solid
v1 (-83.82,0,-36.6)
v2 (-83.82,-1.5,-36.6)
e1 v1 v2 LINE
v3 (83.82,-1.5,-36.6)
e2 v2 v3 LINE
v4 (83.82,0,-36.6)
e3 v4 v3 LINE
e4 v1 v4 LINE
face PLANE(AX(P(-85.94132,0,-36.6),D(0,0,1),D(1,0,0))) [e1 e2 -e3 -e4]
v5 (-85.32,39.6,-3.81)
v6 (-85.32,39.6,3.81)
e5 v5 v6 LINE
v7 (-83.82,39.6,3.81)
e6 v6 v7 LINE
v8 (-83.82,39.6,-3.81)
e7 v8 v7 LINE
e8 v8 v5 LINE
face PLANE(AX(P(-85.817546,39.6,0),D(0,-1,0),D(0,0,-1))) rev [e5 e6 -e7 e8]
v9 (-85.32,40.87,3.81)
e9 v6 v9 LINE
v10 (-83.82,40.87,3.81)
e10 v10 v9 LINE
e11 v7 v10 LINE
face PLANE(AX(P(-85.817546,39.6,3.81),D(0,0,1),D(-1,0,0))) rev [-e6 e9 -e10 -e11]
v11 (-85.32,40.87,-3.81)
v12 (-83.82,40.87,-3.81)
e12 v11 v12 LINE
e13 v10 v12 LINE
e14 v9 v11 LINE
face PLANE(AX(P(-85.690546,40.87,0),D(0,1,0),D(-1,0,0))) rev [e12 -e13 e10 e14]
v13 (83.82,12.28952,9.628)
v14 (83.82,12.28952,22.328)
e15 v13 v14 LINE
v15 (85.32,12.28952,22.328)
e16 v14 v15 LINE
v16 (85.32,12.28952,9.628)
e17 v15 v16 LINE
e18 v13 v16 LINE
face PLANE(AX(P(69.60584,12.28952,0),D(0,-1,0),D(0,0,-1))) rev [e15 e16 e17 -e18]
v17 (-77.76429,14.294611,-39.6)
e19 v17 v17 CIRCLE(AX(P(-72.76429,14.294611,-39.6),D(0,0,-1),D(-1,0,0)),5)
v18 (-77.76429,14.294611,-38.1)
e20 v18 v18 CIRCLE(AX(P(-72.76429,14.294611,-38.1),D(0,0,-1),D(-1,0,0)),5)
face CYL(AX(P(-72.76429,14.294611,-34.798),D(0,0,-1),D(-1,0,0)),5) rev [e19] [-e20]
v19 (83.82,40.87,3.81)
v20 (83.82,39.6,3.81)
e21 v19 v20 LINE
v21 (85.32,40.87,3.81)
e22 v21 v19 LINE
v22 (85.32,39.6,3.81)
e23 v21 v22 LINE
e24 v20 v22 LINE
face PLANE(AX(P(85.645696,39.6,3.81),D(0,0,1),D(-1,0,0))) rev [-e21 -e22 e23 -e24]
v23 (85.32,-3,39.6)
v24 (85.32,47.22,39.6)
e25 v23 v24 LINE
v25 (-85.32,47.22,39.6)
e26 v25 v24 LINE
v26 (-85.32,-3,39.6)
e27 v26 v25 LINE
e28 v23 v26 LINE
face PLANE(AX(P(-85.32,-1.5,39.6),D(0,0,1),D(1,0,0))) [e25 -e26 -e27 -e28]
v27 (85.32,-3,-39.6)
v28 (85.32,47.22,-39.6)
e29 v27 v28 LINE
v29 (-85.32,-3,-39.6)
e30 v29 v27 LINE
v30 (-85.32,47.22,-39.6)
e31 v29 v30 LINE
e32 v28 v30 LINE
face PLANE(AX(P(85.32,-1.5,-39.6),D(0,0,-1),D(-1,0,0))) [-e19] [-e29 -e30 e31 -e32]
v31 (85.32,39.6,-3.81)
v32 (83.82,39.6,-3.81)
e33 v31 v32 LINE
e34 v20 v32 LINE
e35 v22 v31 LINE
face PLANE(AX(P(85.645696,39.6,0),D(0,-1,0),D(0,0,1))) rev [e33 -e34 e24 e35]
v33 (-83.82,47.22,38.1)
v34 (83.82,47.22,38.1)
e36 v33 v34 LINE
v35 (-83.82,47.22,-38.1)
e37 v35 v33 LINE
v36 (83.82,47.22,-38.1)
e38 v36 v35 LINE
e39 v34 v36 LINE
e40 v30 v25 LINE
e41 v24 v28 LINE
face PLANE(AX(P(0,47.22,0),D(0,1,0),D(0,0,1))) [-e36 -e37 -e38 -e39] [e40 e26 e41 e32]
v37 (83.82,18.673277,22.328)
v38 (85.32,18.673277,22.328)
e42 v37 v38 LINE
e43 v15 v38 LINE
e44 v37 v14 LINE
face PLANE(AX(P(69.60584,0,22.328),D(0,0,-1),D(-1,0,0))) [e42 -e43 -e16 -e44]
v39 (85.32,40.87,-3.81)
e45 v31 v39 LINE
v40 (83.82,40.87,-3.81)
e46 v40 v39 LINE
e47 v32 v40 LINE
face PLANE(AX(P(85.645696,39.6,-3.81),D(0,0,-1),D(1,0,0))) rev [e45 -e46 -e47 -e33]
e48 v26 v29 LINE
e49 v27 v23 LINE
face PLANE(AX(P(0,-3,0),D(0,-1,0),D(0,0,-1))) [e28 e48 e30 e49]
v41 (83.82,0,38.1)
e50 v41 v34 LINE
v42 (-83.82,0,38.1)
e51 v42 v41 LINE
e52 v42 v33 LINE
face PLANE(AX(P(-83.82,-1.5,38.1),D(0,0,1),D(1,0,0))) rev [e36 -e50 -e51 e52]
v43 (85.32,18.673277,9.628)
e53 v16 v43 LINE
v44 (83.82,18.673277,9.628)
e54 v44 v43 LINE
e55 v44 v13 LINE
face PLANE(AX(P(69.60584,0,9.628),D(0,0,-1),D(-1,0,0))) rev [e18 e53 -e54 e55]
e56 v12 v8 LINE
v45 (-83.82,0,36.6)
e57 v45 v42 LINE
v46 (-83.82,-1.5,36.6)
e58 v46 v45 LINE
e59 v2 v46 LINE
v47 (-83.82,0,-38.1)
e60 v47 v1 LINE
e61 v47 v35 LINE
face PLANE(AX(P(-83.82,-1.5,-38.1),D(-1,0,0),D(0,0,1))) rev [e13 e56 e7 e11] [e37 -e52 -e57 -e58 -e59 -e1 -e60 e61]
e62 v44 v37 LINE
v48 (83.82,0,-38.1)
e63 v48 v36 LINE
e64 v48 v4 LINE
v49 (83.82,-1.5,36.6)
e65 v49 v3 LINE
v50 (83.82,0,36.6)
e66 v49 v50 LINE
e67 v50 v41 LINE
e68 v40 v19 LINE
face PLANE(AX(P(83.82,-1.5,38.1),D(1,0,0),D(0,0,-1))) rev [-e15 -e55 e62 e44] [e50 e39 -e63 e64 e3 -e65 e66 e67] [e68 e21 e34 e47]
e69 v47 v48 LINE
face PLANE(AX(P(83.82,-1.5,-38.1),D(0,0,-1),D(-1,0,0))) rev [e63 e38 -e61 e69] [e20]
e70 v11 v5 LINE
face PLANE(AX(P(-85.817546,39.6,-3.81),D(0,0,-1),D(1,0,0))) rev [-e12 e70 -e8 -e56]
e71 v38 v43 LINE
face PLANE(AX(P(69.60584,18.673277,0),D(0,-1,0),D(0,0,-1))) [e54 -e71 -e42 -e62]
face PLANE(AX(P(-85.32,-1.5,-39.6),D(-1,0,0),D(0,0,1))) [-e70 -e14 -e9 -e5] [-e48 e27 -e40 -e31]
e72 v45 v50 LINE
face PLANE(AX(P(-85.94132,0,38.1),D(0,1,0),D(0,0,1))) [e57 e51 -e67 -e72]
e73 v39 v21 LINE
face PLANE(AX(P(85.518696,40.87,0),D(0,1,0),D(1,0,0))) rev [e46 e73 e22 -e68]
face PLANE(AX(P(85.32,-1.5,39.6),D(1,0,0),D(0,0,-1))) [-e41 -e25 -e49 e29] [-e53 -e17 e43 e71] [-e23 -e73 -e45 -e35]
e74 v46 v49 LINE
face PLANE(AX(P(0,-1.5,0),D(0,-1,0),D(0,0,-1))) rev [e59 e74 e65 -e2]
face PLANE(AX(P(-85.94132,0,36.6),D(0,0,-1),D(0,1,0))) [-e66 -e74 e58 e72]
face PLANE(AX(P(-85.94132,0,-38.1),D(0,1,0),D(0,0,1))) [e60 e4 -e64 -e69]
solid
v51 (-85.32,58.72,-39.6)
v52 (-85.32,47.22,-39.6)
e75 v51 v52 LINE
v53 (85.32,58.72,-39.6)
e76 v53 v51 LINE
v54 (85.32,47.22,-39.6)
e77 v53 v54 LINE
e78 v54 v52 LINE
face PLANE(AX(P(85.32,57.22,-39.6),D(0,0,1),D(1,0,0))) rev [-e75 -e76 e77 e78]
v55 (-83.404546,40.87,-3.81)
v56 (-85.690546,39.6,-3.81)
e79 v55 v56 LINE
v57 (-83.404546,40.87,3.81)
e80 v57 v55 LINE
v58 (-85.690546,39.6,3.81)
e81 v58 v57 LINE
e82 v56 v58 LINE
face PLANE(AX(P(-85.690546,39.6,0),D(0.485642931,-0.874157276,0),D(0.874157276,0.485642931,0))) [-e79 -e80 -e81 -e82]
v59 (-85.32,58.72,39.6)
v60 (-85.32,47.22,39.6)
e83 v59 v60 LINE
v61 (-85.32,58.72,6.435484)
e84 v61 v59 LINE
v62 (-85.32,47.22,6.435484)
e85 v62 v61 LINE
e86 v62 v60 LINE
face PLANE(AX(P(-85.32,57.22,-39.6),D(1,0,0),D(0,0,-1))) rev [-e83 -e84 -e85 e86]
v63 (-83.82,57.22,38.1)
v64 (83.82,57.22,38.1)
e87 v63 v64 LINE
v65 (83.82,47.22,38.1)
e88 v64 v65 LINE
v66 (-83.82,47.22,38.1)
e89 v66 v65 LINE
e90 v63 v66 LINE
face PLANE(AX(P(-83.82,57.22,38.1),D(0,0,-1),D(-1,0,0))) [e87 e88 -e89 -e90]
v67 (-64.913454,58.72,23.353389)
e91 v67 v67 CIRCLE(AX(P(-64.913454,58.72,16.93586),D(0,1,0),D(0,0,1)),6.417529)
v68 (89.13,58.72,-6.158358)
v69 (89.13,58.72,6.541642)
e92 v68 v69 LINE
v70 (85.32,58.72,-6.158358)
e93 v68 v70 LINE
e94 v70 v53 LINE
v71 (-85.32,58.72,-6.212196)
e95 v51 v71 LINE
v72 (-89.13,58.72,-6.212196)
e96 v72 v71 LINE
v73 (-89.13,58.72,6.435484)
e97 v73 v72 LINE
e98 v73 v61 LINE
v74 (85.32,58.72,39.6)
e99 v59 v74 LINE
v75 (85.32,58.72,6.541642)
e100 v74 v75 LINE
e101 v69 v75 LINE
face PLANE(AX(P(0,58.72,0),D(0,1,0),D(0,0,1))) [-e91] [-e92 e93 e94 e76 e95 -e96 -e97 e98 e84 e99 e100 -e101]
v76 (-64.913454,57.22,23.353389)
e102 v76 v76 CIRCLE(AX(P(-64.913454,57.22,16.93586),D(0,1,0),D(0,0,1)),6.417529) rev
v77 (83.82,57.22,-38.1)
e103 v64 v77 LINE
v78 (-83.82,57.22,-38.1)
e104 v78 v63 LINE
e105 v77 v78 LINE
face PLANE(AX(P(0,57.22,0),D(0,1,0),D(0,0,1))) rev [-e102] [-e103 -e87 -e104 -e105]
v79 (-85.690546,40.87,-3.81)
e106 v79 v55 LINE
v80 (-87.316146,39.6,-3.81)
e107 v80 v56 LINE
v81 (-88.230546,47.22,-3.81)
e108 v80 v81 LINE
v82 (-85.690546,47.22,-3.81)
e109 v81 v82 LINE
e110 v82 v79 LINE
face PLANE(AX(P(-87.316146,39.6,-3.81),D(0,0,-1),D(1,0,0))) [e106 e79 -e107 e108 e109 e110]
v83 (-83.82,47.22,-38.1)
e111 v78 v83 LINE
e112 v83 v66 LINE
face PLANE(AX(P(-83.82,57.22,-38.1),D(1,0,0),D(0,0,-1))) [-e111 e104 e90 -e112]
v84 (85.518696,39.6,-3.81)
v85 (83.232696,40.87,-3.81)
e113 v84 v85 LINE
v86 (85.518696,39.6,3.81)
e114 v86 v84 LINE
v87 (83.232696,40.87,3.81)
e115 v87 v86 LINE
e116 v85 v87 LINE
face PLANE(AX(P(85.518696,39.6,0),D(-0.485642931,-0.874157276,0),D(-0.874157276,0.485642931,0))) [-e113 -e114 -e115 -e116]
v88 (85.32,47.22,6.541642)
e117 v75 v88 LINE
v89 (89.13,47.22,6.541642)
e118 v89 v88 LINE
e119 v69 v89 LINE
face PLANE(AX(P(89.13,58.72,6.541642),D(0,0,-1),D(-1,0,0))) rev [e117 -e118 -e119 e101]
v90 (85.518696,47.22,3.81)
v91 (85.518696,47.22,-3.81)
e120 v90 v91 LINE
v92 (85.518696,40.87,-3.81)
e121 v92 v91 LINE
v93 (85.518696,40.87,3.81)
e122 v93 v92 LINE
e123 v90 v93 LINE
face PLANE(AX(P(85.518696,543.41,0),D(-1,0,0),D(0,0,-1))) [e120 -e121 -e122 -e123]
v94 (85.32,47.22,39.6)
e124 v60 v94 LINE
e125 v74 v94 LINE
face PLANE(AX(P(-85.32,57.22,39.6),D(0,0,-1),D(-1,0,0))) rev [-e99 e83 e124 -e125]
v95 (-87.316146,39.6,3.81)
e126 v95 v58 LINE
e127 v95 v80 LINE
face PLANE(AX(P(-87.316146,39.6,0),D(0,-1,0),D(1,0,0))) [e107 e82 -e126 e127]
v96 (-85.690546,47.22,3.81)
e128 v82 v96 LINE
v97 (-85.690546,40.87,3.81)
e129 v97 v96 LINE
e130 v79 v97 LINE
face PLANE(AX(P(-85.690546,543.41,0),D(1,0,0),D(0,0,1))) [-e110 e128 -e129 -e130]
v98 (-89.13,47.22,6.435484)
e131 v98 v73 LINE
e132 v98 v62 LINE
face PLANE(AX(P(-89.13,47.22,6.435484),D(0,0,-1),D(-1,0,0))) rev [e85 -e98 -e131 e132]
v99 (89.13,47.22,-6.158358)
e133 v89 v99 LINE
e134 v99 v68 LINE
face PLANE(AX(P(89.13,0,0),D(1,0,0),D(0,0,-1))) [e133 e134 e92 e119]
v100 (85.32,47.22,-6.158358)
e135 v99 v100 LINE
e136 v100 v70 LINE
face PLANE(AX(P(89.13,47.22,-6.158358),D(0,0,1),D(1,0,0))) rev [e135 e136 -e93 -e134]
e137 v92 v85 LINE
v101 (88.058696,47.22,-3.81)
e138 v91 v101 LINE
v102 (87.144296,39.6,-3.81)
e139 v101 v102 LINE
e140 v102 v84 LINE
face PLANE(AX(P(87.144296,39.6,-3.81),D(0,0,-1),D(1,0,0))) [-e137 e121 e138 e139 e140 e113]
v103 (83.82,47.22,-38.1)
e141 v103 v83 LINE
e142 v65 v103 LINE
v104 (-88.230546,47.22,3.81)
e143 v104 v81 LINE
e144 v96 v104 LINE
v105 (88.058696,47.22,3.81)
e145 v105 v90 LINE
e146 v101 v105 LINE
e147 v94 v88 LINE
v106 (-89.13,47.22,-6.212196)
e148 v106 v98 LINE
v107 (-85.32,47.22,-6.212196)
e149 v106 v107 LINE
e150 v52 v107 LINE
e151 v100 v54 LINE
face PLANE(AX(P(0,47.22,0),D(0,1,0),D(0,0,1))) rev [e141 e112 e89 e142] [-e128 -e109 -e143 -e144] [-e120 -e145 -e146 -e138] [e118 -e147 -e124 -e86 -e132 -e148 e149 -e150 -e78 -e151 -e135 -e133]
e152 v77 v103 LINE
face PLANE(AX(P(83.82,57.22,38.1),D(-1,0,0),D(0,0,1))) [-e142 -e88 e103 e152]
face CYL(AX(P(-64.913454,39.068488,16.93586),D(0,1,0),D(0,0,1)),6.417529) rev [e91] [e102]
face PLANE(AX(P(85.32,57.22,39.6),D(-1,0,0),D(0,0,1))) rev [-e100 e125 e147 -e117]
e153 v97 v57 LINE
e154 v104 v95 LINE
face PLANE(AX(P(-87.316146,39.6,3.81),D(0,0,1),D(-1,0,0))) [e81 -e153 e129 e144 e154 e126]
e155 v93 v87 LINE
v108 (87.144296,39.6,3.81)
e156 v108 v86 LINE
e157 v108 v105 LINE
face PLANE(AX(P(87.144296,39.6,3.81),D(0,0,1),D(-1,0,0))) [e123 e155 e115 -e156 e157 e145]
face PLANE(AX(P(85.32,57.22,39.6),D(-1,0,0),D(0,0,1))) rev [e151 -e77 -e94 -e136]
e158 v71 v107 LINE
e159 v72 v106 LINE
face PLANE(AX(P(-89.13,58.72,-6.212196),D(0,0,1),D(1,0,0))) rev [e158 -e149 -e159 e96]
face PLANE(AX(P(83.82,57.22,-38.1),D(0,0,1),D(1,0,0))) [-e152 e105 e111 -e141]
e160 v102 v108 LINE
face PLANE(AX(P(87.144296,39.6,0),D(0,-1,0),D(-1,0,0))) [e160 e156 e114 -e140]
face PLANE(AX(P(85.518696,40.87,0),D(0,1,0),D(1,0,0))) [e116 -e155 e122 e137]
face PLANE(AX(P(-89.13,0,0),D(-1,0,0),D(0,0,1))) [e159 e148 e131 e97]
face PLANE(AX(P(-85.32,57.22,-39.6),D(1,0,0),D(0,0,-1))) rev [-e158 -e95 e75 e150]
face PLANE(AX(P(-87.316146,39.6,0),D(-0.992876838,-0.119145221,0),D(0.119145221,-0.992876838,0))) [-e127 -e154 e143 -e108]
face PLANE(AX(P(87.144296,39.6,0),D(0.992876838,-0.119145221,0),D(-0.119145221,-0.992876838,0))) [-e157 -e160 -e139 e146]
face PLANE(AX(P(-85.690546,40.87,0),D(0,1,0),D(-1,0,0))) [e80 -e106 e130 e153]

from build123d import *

# Parameters (mm, degrees)
SKETCH15_W             = 167.64
SKETCH15_H             = 76.2
BB_STM_SIHLOETTE_DEPTH = 1.5
BASEWALL_DEPTH         = 45.72
BASEWALL_DEPTH_BACK    = 3
SKETCH29_W             = 170.64
SKETCH29_H             = 79.2
SKETCH29_W_2           = 167.64
SKETCH29_H_2           = 76.2
SKETCH31_W             = 1.5
SKETCH31_H             = 1.5
BASESUPPORT_DEPTH      = 169.14
BASESUPPORT_2_DEPTH    = 169.14
SKETCH33_W             = 170.64
SKETCH33_H             = 79.2
BASEBOTTOM_DEPTH       = 1.5
SKETCH43_W             = 12.7
SKETCH43_H             = 6.383756828
CUT_EXTRUDE8_DEPTH     = 1.5
SKETCH36_W             = 170.64
SKETCH36_H             = 79.2
SKETCH36_W_2           = 167.64
SKETCH36_H_2           = 76.2
BOSS_EXTRUDE16_DEPTH   = 10
SKETCH37_W             = 170.64
SKETCH37_H             = 79.2
BOSS_EXTRUDE17_DEPTH   = 1.5
SKETCH39_R             = 5
CUT_EXTRUDE5_DEPTH     = 4.802
SKETCH41_R             = 6.417528543
CUT_EXTRUDE6_DEPTH     = 1.5
SKETCH46_W             = 12.7
SKETCH46_H             = 11.5
BOSS_EXTRUDE18_DEPTH   = 3.81
SNAP_START             = -3.81
SNAP_HOOK4_DEPTH       = 7.62
SNAP_START_2           = 39.6
SNAP_GROOVE3_OUTLINE_W = 1.5
SNAP_GROOVE3_OUTLINE_H = 7.62
SNAP_GROOVE3_DEPTH     = 1.27
SKETCH51_W             = 12.647680061
SKETCH51_H             = 11.5
BOSS_EXTRUDE19_DEPTH   = 3.81
SNAP_HOOK5_DEPTH       = 7.62
SNAP_GROOVE4_OUTLINE_W = 1.5
SNAP_GROOVE4_OUTLINE_H = 7.62
SNAP_GROOVE4_DEPTH     = 1.27


# Read off the part's stored shape, not the designer's step: Snap Hook4, Snap Groove3, Snap Hook5, Snap Groove4
with BuildPart() as part:
    # Sketch15 → BB+STM Sihloette (new body)
    with BuildSketch(Plane(origin=(0, 0, 0), x_dir=(1, 0, 0), z_dir=(0, 1, 0))):
        Rectangle(SKETCH15_W, SKETCH15_H)
    extrude(amount=BB_STM_SIHLOETTE_DEPTH)


with BuildPart() as body_2:
    # Sketch29 → basewall (new, two sides: drawn at the far end of the back side and taken through both)
    with BuildSketch(Plane(origin=(0, 1.5, 0), x_dir=(1, 0, 0), z_dir=(0, 1, 0)).offset(-BASEWALL_DEPTH_BACK)):
        Rectangle(SKETCH29_W, SKETCH29_H)
        Rectangle(SKETCH29_W_2, SKETCH29_H_2, mode=Mode.SUBTRACT)
    extrude(amount=BASEWALL_DEPTH + BASEWALL_DEPTH_BACK)



with BuildPart() as body_3:
    # Sketch31 → basesupport (new body)
    with BuildSketch(Plane(origin=(85.32, 0, 0), x_dir=(0, 0, -1), z_dir=(1, 0, 0))):
        with Locations((37.35, -0.75)):
            Rectangle(SKETCH31_W, SKETCH31_H)
    extrude(amount=-BASESUPPORT_DEPTH)


with BuildPart() as body_4:
    # Sketch31 → basesupport 2 (new body)
    with BuildSketch(Plane(origin=(85.32, 0, 0), x_dir=(0, 0, -1), z_dir=(1, 0, 0))):
        with Locations((-37.35, -0.75)):
            Rectangle(SKETCH31_W, SKETCH31_H)
    extrude(amount=-BASESUPPORT_2_DEPTH)


with BuildPart() as body_2_1:
    add(body_2.part)

    add(body_3.part)  # basebottom merges body 3

    add(body_4.part)  # basebottom merges body 4
    # Sketch33 → basebottom (add)
    with BuildSketch(Plane.XZ.offset(1.5)):
        Rectangle(SKETCH33_W, SKETCH33_H)
    extrude(amount=BASEBOTTOM_DEPTH)

    # Sketch43 → Cut-Extrude8 (cut)
    with BuildSketch(Plane(origin=(85.32, 0, 0), x_dir=(0, 0, -1), z_dir=(1, 0, 0))):
        with Locations((-15.978, 15.481398318)):
            Rectangle(SKETCH43_W, SKETCH43_H)
    extrude(amount=-CUT_EXTRUDE8_DEPTH, mode=Mode.SUBTRACT)

    # Sketch39 → Cut-Extrude5 (cut)
    with BuildSketch(Plane(origin=(0, 0, -39.6), x_dir=(-1, 0, 0), z_dir=(0, 0, -1))):
        with Locations((72.764290204, 14.294611028)):
            Circle(SKETCH39_R)
    extrude(amount=-CUT_EXTRUDE5_DEPTH, mode=Mode.SUBTRACT)

    # Snap Groove3 outline → Snap Groove3 (cut)
    with BuildSketch(Plane(origin=(0, 0, 0), x_dir=(1, 0, 0), z_dir=(0, 1, 0)).offset(SNAP_START_2)):
        with Locations((84.57, 0)):
            Rectangle(SNAP_GROOVE3_OUTLINE_W, SNAP_GROOVE3_OUTLINE_H)
    extrude(amount=SNAP_GROOVE3_DEPTH, mode=Mode.SUBTRACT)

    # Snap Groove4 outline → Snap Groove4 (cut)
    with BuildSketch(Plane(origin=(0, 0, 0), x_dir=(1, 0, 0), z_dir=(0, 1, 0)).offset(SNAP_START_2)):
        with Locations((-84.57, 0)):
            Rectangle(SNAP_GROOVE4_OUTLINE_W, SNAP_GROOVE4_OUTLINE_H)
    extrude(amount=SNAP_GROOVE4_DEPTH, mode=Mode.SUBTRACT)


with BuildPart() as body_2_2:
    # Sketch36 → Boss-Extrude16 (new body)
    with BuildSketch(Plane(origin=(0, 47.22, 0), x_dir=(1, 0, 0), z_dir=(0, 1, 0))):
        Rectangle(SKETCH36_W, SKETCH36_H)
        Rectangle(SKETCH36_W_2, SKETCH36_H_2, mode=Mode.SUBTRACT)
    extrude(amount=BOSS_EXTRUDE16_DEPTH)

    # Sketch37 → Boss-Extrude17 (add)
    with BuildSketch(Plane(origin=(0, 57.22, 0), x_dir=(1, 0, 0), z_dir=(0, 1, 0))):
        Rectangle(SKETCH37_W, SKETCH37_H)
    extrude(amount=BOSS_EXTRUDE17_DEPTH)

    # Sketch41 → Cut-Extrude6 (cut)
    with BuildSketch(Plane(origin=(0, 58.72, 0), x_dir=(1, 0, 0), z_dir=(0, 1, 0))):
        with Locations(Location((-64.913453937, -16.935860424, 0), (0, 0, 270))):
            Circle(SKETCH41_R)
    extrude(amount=-CUT_EXTRUDE6_DEPTH, mode=Mode.SUBTRACT)

    # Sketch46 → Boss-Extrude18 (add)
    with BuildSketch(Plane(origin=(85.32, 0, 0), x_dir=(0, 0, -1), z_dir=(1, 0, 0))):
        with Locations((-0.191641666, 52.97)):
            Rectangle(SKETCH46_W, SKETCH46_H)
    extrude(amount=BOSS_EXTRUDE18_DEPTH)

    # Snap Hook4 outline → Snap Hook4 (add)
    with BuildSketch(Plane.XY.offset(SNAP_START)):
        Polygon((88.058695511, 47.22), (85.518695511, 47.22), (85.518695511, 40.87), (83.232695511, 40.87), (85.518695511, 39.6), (87.144295511, 39.6), align=None)
    extrude(amount=SNAP_HOOK4_DEPTH)

    # Sketch51 → Boss-Extrude19 (add)
    with BuildSketch(Plane.ZY.offset(85.32)):
        with Locations((0.111644465, 52.97)):
            Rectangle(SKETCH51_W, SKETCH51_H)
    extrude(amount=BOSS_EXTRUDE19_DEPTH)

    # Snap Hook5 outline → Snap Hook5 (add)
    with BuildSketch(Plane.XY.offset(SNAP_START)):
        Polygon((-88.230545756, 47.22), (-87.316145756, 39.6), (-85.690545756, 39.6), (-83.404545756, 40.87), (-85.690545756, 40.87), (-85.690545756, 47.22), align=None)
    extrude(amount=SNAP_HOOK5_DEPTH)


solid = Compound([body_2_1.part, body_2_2.part])
